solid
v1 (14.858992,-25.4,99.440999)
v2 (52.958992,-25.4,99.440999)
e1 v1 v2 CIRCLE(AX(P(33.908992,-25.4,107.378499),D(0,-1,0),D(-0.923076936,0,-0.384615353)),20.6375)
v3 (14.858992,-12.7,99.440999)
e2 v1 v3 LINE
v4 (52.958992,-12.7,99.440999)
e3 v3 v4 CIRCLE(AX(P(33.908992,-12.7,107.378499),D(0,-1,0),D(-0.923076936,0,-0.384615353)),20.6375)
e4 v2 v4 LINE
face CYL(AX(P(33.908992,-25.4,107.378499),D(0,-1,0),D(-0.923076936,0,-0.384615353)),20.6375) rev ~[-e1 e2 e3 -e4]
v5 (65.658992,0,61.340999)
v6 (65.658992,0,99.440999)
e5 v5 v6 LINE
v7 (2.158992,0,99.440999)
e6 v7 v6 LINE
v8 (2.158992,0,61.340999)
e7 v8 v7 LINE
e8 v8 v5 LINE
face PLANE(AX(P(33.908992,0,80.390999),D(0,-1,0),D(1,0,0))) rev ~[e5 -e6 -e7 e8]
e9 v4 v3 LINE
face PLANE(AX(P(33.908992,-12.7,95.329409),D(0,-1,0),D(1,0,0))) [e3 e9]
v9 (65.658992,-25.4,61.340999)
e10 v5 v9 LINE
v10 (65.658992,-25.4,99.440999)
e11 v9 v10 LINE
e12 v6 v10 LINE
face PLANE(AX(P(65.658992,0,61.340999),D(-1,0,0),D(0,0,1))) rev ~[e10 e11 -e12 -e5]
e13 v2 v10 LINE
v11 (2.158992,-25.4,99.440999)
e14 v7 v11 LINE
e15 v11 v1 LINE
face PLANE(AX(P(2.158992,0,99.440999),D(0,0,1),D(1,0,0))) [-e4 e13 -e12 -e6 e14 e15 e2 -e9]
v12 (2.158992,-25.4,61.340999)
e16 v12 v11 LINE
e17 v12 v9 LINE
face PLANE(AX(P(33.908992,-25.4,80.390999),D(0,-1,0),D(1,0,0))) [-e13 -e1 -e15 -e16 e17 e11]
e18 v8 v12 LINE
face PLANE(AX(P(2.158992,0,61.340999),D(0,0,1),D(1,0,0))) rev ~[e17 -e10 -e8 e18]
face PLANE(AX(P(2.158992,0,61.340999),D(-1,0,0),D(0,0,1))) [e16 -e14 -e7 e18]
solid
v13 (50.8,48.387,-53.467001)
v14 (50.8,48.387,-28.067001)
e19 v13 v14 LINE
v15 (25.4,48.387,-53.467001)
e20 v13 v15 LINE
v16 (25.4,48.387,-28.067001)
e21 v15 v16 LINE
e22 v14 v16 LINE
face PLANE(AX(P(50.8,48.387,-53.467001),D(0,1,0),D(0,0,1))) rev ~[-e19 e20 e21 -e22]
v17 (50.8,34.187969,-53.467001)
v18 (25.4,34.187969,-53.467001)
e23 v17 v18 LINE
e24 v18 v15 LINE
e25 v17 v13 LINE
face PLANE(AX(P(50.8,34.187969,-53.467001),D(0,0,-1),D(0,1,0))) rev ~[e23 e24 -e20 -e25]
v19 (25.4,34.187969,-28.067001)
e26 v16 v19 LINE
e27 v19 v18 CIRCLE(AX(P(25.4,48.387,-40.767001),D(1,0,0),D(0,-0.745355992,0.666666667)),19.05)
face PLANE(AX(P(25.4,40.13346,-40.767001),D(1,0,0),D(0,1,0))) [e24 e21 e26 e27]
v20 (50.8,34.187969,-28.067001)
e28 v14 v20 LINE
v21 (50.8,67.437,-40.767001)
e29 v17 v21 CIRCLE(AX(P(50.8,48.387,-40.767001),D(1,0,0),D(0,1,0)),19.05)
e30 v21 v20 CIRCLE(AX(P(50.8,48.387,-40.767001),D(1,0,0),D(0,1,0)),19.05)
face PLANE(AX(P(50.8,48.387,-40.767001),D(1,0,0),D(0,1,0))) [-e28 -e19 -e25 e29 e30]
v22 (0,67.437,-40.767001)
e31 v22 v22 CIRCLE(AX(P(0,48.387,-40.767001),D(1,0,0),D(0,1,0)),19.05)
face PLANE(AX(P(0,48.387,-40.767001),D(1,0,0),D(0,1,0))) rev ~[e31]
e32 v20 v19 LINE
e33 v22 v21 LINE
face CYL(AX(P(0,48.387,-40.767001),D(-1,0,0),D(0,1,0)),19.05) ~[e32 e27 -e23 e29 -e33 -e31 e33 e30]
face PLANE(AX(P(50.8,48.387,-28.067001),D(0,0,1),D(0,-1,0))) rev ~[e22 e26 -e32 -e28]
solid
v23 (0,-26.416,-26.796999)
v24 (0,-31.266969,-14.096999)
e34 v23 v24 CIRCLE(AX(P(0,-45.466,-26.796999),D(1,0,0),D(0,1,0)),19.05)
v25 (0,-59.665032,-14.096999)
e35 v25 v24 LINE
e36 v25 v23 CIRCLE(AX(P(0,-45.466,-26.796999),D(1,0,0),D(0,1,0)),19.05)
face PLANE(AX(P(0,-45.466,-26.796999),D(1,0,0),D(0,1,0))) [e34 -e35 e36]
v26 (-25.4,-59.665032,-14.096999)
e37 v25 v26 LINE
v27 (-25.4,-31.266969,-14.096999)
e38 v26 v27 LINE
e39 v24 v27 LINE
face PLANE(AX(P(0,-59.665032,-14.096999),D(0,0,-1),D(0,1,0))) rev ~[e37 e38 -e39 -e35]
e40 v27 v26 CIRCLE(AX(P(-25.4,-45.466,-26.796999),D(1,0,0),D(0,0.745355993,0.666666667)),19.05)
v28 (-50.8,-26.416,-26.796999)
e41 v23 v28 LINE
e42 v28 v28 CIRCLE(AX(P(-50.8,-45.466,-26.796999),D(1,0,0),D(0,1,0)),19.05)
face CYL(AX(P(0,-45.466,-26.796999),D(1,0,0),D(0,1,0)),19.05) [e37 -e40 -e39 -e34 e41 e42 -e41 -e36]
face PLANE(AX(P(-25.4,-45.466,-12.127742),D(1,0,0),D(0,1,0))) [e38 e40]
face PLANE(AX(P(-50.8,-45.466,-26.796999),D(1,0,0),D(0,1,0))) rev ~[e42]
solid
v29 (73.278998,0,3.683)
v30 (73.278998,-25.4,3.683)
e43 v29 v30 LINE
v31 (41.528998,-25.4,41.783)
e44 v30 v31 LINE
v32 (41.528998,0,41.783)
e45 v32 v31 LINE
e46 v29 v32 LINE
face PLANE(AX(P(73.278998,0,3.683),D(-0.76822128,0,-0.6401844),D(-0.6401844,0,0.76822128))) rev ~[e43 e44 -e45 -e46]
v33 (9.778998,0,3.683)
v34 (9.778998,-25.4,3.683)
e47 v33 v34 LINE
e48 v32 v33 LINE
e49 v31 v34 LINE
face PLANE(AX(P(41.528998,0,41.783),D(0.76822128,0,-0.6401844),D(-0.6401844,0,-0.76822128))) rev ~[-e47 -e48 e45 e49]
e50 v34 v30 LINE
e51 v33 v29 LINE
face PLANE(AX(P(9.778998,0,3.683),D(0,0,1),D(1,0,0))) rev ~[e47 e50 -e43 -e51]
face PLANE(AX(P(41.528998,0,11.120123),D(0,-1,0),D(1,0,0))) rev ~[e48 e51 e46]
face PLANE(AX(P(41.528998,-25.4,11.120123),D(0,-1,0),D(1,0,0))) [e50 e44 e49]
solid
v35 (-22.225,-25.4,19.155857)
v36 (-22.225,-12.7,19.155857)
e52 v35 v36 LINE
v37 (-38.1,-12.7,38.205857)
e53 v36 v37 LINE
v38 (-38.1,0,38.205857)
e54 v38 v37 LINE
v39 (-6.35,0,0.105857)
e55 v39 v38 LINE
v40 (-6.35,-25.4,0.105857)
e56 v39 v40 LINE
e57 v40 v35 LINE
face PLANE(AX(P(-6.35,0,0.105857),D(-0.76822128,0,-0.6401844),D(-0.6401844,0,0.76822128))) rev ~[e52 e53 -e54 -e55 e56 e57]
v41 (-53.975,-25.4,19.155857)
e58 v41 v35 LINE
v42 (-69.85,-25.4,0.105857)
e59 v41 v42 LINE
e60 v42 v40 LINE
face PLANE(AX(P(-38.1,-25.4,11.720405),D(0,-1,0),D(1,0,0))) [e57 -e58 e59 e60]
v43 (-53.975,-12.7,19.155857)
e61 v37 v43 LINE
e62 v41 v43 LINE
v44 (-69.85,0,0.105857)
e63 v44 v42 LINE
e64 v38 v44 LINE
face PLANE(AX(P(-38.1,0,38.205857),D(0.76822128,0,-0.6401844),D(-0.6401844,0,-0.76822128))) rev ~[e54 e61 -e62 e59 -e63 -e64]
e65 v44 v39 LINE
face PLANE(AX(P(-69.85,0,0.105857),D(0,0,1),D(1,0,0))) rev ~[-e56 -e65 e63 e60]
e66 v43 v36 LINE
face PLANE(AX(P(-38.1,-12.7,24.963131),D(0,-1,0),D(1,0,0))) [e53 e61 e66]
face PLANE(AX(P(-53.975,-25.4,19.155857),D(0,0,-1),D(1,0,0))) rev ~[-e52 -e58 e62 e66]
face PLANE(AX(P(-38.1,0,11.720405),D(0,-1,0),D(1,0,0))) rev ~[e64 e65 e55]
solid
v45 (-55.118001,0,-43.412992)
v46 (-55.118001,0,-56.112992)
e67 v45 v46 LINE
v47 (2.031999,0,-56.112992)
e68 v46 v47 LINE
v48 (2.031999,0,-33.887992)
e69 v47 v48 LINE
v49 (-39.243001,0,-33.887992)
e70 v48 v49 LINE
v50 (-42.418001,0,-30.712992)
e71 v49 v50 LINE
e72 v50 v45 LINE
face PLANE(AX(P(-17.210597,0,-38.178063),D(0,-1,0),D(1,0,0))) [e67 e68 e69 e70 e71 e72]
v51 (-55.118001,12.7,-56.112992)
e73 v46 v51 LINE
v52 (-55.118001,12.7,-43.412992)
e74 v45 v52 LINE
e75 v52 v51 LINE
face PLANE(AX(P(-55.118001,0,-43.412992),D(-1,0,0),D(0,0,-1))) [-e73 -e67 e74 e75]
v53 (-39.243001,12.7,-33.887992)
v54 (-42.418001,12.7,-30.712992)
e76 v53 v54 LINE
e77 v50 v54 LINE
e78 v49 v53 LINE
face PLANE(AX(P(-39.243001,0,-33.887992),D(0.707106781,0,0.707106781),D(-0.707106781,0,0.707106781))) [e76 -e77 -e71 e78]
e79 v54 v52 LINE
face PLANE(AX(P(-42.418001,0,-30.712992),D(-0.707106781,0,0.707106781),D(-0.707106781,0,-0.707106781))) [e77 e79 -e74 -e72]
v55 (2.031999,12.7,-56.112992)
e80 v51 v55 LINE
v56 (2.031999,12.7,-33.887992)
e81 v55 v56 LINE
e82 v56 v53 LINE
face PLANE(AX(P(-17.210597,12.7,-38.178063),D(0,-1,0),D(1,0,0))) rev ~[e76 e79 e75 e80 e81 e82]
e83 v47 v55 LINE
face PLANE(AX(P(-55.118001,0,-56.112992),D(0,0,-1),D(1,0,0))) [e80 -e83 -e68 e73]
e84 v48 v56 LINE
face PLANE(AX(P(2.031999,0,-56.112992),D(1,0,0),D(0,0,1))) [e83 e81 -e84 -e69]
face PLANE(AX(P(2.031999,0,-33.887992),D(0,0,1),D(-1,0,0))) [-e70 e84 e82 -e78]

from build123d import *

# Parameters (mm, degrees)
F1_DEPTH  = 25.4
F3_DEPTH  = 12.7
F5_DEPTH  = 25.4
F6_W      = 31.75
F6_H      = 12.7
F7_DEPTH  = 12.7
F8_R      = 19.05
F9_DEPTH  = 50.8
F11_DEPTH = 25.4
F12_R     = 19.05
F13_DEPTH = 50.8
F15_DEPTH = 25.4
F16_W     = 63.5
F16_H     = 38.1000004709
F17_DEPTH = 25.4
F19_DEPTH = 12.7


with BuildPart() as f1:
    # F0 (on Front) → F1 (new body)
    with BuildSketch(Plane.XZ):
        Polygon((-38.1, 38.2058574115), (-69.85, 0.1058574115), (-6.35, 0.1058574115), align=None)
    extrude(amount=F1_DEPTH)

    # F2 (on face) → F3 (cut)
    with BuildSketch(Plane.XZ.offset(25.4)):
        Polygon((-53.975, 19.1558574115), (-38.1, 19.1558574115), (-22.225, 19.1558574115), (-38.1, 38.2058574115), align=None)
    extrude(amount=-F3_DEPTH, mode=Mode.SUBTRACT)


with BuildPart() as f5:
    # F4 (on Front) → F5 (new body)
    with BuildSketch(Plane.XZ):
        Polygon((25.6539984085, 22.7330001045), (9.7789984085, 3.6830001045), (73.2789984085, 3.6830001045), (57.4039984085, 22.7330001045), (41.5289984085, 22.7330001045), align=None)
        Polygon((41.5289984085, 41.7830001045), (25.6539984085, 22.7330001045), (41.5289984085, 22.7330001045), (57.4039984085, 22.7330001045), align=None)
    extrude(amount=F5_DEPTH)


with BuildPart() as f7:
    # F6 (on Front) → F7 (new body)
    with BuildSketch(Plane.XZ):
        Polygon((-39.2430012196, -33.8879922846), (-29.7180012196, -43.4129922846), (2.0319987804, -43.4129922846), (2.0319987804, -33.8879922846), align=None)
        with Locations((-13.8430012196, -49.7629922846)):
            Rectangle(F6_W, F6_H)
        Polygon((-55.1180012196, -43.4129922846), (-55.1180012196, -56.1129922846), (-29.7180012196, -56.1129922846), (-29.7180012196, -43.4129922846), (-39.2430012196, -33.8879922846), (-42.4180012196, -30.7129922846), align=None)
    extrude(amount=-F7_DEPTH)


with BuildPart() as f9:
    # F8 (on Right) → F9 (new body)
    with BuildSketch(Plane.YZ):
        with Locations((-45.4660002142, -26.7969986916)):
            Circle(F8_R)
    extrude(amount=-F9_DEPTH)

    # F10 (on face) → F11 (cut)
    with BuildSketch(Plane.YZ):
        with BuildLine():
            Line((-59.6650318713, -14.0969986916), (-45.4660002142, -14.0969986916))
            Line((-45.4660002142, -14.0969986916), (-31.2669685571, -14.0969986916))
            ThreePointArc((-31.2669685571, -14.0969986916), (-45.4660002142, -7.7469986916), (-59.6650318713, -14.0969986916))
        make_face()
    extrude(amount=-F11_DEPTH, mode=Mode.SUBTRACT)


with BuildPart() as f13:
    # F12 (on Right) → F13 (new body)
    with BuildSketch(Plane.YZ):
        with Locations((48.3870003372, -40.7670012236)):
            Circle(F12_R)
    extrude(amount=F13_DEPTH)

    # F14 (on face) → F15 (cut)
    with BuildSketch(Plane.YZ.offset(50.8)):
        with BuildLine():
            Line((48.3870003372, -53.4670012236), (48.3870003372, -40.7670012236))
            Line((48.3870003372, -40.7670012236), (48.3870003372, -28.0670012236))
            Line((48.3870003372, -28.0670012236), (34.1879686801, -28.0670012236))
            ThreePointArc((34.1879686801, -28.0670012236), (29.3370003372, -40.7670012236), (34.1879686801, -53.4670012236))
            Line((34.1879686801, -53.4670012236), (48.3870003372, -53.4670012236))
        make_face()
    extrude(amount=-F15_DEPTH, mode=Mode.SUBTRACT)


with BuildPart() as f17:
    # F16 (on Front) → F17 (new body)
    with BuildSketch(Plane.XZ):
        with Locations((33.9089920744, 80.3909990937)):
            Rectangle(F16_W, F16_H)
    extrude(amount=F17_DEPTH)

    # F18 (on face) → F19 (cut)
    with BuildSketch(Plane.XZ.offset(25.4)):
        with BuildLine():
            Line((52.9589920744, 99.4409993291), (14.8589920744, 99.4409993291))
            ThreePointArc((14.8589920744, 99.4409993291), (33.9089920744, 86.7409988582), (52.9589920744, 99.4409993291))
        make_face()
    extrude(amount=-F19_DEPTH, mode=Mode.SUBTRACT)


solid = Compound([f1.part, f5.part, f7.part, f9.part, f13.part, f17.part])
